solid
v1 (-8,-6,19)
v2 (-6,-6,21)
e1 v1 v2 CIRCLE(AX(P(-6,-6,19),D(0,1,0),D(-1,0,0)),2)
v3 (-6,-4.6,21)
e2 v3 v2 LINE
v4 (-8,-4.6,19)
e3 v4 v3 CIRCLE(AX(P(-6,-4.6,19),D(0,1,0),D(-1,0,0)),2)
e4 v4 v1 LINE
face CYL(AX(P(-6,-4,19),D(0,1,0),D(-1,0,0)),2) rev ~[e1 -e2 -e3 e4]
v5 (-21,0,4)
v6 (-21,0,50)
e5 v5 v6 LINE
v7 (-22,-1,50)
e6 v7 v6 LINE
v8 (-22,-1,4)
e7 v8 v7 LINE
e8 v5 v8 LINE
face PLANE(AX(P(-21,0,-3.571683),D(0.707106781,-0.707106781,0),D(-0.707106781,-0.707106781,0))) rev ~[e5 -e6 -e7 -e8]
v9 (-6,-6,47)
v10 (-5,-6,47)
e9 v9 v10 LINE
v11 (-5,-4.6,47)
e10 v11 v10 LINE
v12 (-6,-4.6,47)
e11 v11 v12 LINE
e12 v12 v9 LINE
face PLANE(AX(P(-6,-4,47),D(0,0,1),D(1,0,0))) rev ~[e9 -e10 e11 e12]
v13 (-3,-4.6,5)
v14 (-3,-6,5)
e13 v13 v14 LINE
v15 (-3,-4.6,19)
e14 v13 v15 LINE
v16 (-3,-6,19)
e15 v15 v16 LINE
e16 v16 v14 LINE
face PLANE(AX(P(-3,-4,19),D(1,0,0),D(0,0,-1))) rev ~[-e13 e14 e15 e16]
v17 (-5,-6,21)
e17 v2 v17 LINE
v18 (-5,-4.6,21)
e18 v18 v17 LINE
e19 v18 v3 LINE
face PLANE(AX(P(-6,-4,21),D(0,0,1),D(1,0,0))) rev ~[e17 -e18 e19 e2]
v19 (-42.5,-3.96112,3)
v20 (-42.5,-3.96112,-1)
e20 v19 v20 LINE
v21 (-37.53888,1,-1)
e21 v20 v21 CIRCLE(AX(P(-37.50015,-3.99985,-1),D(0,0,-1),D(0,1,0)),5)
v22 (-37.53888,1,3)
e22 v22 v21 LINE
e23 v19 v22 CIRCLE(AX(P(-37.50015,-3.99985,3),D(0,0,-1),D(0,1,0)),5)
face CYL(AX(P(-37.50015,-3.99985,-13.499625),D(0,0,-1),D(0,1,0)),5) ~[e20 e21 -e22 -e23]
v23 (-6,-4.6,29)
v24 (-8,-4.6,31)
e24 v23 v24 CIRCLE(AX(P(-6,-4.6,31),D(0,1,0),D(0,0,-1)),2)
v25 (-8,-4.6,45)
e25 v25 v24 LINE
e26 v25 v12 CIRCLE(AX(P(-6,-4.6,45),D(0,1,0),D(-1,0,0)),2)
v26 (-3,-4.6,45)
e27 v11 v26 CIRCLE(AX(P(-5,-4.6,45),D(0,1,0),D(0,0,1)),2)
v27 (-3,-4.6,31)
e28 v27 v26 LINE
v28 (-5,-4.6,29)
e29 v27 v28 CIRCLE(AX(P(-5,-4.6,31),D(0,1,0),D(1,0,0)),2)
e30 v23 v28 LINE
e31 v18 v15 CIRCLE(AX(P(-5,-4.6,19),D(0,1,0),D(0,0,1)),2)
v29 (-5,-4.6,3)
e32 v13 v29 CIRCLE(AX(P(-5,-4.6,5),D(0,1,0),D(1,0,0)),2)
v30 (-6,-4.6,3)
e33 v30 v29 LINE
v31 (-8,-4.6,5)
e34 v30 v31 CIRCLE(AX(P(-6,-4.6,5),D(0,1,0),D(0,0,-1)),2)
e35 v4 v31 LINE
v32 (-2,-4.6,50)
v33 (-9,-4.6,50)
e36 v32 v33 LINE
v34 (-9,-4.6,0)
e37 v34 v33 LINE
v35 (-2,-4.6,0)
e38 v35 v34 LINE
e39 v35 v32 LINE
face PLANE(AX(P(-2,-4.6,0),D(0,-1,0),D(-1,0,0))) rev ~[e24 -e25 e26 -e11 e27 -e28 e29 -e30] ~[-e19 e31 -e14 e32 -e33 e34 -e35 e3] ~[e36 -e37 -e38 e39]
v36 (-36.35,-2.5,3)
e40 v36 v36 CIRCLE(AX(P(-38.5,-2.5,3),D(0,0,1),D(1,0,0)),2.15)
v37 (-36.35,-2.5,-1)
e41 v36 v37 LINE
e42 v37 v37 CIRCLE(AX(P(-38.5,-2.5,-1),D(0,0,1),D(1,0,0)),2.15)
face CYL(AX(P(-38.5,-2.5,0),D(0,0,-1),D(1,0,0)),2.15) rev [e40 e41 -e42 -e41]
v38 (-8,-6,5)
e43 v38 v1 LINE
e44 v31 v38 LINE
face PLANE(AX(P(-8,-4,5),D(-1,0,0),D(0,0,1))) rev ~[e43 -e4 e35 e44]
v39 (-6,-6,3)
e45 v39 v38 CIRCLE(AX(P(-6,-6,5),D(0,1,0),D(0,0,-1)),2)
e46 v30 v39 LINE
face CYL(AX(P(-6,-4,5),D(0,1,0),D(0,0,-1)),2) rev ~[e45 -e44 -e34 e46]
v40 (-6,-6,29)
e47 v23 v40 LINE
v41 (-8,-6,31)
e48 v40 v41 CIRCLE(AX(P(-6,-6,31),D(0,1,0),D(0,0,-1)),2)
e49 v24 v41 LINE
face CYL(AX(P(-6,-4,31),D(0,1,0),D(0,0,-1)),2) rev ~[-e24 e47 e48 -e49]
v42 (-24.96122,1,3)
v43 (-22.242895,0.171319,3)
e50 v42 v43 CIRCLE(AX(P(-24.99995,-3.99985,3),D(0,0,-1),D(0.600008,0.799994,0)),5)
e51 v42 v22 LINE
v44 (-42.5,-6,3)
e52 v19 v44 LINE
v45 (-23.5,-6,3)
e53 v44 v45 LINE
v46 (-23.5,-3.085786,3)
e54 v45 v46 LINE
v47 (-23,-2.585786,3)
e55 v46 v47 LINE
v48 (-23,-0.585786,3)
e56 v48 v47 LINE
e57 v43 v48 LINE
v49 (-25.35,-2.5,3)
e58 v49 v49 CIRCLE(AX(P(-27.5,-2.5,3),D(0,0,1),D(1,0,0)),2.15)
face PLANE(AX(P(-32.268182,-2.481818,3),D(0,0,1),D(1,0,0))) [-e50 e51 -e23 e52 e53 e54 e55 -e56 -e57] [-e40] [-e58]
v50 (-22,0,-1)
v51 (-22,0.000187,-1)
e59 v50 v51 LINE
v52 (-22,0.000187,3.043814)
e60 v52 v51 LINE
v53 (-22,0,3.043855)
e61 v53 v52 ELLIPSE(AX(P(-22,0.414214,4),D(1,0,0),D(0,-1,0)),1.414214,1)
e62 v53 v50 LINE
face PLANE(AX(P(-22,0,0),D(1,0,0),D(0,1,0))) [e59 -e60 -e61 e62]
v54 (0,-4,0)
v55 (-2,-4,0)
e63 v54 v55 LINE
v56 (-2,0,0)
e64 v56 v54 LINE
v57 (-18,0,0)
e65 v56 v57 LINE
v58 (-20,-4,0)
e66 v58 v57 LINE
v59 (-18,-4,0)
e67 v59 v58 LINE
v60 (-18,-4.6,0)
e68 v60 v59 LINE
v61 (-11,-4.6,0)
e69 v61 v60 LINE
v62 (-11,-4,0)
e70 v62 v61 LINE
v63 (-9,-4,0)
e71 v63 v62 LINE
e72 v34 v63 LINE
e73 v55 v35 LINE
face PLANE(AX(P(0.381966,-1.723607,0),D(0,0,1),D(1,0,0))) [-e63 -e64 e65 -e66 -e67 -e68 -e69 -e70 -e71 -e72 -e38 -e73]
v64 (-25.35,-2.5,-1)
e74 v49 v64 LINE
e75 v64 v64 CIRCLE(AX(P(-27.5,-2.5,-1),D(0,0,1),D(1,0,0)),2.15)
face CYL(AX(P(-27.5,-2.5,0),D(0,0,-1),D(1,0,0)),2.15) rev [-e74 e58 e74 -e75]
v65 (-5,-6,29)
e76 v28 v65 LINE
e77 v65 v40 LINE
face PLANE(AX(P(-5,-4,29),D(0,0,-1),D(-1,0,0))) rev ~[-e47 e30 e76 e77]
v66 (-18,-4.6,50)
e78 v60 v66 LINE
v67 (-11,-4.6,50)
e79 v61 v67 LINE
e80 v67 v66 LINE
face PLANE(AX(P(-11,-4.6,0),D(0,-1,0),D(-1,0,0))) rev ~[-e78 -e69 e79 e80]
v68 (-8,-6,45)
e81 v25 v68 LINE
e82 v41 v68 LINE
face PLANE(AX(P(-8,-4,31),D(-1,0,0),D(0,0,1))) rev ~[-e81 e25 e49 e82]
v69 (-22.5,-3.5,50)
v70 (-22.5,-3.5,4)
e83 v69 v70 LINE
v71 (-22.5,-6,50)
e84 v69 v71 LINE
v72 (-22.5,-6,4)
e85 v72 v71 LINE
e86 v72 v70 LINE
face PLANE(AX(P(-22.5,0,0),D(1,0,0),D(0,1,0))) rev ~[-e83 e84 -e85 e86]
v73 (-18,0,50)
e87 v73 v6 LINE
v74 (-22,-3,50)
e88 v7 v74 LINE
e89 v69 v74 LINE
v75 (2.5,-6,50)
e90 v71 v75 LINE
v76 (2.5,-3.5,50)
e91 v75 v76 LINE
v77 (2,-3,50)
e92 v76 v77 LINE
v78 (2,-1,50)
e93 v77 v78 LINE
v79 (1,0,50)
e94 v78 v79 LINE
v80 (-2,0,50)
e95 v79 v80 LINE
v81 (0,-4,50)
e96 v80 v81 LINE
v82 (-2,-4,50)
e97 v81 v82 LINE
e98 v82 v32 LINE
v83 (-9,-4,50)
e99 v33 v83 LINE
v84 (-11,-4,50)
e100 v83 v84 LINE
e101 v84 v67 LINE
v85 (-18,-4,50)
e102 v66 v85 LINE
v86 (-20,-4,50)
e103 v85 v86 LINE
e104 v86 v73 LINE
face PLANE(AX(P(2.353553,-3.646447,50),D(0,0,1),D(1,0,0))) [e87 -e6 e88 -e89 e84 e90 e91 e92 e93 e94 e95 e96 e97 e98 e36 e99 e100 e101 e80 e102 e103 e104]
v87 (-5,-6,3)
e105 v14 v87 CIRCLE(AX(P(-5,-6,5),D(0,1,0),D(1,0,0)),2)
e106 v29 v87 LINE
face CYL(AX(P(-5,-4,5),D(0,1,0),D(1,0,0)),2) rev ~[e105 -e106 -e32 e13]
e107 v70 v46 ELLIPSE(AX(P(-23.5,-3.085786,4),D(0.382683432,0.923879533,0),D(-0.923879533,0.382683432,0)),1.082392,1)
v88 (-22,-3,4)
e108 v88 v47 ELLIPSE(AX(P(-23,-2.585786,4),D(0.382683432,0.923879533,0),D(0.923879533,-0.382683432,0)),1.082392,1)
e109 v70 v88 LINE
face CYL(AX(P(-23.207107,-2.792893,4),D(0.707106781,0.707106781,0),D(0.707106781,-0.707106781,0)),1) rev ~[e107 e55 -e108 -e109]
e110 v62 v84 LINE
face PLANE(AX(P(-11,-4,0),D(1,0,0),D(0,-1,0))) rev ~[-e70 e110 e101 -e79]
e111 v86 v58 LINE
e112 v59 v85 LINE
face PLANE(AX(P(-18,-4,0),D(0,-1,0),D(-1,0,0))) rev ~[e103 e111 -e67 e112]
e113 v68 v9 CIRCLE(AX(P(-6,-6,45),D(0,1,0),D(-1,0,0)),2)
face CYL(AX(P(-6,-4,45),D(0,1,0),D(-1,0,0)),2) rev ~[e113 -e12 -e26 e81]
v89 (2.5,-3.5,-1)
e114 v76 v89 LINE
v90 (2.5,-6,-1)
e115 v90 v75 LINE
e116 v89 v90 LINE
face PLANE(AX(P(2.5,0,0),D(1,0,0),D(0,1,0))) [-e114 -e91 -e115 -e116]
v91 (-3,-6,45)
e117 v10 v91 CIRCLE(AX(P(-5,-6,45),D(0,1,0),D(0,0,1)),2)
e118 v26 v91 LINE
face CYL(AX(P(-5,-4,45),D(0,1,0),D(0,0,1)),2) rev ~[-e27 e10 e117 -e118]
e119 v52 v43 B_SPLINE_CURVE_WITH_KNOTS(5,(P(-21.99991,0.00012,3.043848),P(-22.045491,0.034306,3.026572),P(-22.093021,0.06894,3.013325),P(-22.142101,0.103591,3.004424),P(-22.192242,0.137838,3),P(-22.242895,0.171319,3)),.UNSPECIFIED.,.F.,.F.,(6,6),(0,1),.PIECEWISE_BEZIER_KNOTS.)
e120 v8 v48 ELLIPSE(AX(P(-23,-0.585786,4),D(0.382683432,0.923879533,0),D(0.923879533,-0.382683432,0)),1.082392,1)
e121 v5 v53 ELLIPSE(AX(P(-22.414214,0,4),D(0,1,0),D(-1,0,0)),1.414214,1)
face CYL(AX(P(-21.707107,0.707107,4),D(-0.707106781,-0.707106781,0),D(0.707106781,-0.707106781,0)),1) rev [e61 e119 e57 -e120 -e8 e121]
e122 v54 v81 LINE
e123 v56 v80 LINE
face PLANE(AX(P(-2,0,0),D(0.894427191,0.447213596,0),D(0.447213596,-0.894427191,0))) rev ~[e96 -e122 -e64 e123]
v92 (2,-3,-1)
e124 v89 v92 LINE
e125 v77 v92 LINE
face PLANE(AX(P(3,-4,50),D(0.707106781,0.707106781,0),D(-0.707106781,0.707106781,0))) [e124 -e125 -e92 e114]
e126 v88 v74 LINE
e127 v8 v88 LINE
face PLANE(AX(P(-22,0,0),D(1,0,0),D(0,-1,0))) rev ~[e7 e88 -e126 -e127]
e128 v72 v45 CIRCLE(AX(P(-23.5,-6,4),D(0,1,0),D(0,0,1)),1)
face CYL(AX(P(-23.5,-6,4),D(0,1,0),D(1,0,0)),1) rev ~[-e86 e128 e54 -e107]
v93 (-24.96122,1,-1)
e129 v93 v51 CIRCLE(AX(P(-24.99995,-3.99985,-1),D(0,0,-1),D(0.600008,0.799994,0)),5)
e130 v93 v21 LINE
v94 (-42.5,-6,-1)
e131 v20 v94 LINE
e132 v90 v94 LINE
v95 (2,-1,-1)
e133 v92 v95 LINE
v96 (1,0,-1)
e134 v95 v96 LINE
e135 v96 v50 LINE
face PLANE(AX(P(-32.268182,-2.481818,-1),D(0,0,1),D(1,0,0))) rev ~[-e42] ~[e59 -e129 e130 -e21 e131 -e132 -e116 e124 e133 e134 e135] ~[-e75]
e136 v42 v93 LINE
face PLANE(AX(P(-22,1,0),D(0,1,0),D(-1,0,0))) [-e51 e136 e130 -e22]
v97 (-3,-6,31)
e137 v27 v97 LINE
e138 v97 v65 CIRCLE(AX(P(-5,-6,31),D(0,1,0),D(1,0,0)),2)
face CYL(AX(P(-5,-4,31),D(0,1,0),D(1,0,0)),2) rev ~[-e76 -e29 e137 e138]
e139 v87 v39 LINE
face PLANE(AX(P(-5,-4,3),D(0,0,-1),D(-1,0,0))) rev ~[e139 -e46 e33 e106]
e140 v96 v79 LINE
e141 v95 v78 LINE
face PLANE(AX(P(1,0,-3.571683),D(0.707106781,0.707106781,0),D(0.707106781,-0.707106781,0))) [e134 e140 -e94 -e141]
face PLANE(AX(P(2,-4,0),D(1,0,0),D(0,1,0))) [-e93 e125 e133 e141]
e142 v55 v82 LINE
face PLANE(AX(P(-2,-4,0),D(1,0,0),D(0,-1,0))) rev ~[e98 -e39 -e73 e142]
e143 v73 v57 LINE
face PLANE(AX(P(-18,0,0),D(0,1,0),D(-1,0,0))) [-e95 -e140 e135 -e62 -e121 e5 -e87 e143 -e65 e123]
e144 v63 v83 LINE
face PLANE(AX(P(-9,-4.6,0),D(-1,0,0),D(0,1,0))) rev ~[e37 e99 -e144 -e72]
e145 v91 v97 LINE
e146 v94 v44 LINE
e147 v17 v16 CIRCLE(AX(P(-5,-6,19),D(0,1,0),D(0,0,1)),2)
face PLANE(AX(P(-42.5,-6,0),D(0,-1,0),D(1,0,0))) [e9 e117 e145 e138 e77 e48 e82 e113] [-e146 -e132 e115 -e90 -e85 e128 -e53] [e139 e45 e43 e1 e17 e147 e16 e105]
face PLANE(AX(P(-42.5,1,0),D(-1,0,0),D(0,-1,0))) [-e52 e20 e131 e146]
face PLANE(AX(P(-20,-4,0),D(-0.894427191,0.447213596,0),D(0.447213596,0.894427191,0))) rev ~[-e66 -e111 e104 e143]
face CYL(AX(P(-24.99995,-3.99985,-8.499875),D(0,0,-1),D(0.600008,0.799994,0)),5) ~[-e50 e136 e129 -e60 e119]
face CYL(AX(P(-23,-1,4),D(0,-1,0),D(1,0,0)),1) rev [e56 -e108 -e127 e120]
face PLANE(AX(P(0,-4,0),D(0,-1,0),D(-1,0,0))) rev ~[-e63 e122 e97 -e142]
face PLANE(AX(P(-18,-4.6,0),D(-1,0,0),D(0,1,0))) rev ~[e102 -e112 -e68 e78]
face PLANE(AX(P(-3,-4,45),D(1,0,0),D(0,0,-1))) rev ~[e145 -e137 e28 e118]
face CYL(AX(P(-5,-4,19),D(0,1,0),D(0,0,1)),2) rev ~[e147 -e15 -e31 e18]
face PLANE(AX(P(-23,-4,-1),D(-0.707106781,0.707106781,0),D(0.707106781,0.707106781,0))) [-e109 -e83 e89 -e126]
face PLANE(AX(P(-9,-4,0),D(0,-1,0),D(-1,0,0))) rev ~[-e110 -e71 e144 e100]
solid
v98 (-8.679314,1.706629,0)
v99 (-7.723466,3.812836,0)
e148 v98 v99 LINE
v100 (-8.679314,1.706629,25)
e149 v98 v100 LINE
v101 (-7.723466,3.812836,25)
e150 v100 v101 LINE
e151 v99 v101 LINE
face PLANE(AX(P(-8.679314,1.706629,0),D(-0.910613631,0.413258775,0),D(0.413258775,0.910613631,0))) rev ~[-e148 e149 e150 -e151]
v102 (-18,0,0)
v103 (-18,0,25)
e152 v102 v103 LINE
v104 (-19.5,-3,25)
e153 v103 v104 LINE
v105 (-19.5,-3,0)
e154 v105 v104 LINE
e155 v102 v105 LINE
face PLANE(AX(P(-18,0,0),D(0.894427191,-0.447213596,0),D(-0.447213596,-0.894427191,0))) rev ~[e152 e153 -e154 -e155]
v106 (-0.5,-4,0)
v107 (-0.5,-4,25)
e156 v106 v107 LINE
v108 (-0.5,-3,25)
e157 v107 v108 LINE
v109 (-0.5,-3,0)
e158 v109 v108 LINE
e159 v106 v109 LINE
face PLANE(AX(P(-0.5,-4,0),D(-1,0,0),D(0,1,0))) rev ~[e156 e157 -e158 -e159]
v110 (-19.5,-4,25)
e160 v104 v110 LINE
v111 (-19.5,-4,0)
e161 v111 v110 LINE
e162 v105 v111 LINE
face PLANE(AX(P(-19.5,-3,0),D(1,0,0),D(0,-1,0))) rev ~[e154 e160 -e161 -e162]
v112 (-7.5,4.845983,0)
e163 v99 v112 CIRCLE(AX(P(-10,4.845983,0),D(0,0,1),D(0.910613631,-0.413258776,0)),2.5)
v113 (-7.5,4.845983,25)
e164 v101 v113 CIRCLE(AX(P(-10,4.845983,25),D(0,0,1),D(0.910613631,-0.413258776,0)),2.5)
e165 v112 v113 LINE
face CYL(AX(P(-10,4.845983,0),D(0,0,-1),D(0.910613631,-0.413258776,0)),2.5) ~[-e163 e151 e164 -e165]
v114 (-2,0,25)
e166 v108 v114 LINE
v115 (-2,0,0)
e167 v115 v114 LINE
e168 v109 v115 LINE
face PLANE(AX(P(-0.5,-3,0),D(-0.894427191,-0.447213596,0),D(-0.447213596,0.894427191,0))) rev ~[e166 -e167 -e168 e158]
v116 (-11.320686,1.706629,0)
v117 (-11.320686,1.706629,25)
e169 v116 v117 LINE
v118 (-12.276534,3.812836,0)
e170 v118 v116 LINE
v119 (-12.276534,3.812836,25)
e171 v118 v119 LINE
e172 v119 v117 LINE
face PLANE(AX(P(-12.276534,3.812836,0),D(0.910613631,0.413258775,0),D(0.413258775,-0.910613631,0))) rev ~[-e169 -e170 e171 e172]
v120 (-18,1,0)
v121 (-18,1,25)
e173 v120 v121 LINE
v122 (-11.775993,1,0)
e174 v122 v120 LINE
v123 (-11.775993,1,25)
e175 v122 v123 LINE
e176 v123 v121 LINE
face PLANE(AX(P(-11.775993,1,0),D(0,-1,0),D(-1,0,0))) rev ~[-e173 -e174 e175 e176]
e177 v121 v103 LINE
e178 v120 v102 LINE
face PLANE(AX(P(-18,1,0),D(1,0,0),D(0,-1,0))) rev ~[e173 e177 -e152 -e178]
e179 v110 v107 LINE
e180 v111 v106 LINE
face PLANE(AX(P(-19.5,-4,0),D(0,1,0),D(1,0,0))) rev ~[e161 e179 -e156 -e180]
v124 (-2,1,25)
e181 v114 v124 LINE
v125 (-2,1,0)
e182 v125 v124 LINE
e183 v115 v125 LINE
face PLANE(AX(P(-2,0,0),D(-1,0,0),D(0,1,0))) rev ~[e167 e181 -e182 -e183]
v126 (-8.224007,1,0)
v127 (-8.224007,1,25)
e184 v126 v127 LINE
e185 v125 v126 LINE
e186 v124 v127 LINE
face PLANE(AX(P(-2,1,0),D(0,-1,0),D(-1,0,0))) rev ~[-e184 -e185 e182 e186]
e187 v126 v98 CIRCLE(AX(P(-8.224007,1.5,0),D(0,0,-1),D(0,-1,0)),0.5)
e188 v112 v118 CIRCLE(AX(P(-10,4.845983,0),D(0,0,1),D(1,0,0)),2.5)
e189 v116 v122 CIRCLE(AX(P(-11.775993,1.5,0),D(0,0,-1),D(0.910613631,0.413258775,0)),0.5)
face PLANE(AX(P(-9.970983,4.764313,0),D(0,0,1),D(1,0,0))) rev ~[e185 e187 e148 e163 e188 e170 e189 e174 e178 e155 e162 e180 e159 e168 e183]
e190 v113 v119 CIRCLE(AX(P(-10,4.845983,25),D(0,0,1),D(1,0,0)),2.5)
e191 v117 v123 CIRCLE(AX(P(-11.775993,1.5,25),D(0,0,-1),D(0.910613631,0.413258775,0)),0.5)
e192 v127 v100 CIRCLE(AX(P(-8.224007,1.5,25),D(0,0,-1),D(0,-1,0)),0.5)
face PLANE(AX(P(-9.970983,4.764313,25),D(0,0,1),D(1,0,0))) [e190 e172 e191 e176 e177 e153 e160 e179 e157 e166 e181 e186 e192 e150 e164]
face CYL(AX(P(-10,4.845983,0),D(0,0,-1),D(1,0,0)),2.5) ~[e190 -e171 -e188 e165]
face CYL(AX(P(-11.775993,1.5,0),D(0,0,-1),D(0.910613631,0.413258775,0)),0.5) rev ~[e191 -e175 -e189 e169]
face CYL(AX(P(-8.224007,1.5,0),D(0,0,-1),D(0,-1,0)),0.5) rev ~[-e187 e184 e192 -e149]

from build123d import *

# Parameters (mm, degrees)
F1_DEPTH      = 50
F0_W          = 7
F0_H          = 0.6
F2_DEPTH      = 1
F3_T4_DEPTH   = 51
F3_T9_DEPTH   = 51
F3_T11_DEPTH  = 56.1433659759
F5_DEPTH      = 25
F6_DEPTH      = 25
F0_R          = 2.15
F7_DEPTH      = 3
F7_DEPTH_BACK = 1
F8_R          = 1
F9_T1_DEPTH   = 18.9997500167
F9_T3_DEPTH   = 28.9992500113


# Not quite as in the source:
# - a fillet or chamfer that OpenCascade refuses, or shapes differently, is made with other operations: its cross-section is extruded or revolved along the edge and cut away or added


with BuildPart() as f1:
    # F0 (on Top) → F1 (new body)
    with BuildSketch(Plane.XY):
        Polygon((2, 0), (0, 0), (-2, 0), (-0.5, -3), (0, -4), (2, -4), align=None)
        Polygon((-19.5, -3), (-18, 0), (-20, 0), (-22, 0), (-22, -4), (-20, -4), align=None)
        Polygon((2.5, -4), (2, -4), (0, -4), (-0.5, -4), (-2, -4), (-2, -4.6), (-9, -4.6), (-9, -4), (-11, -4), (-11, -4.6), (-18, -4.6), (-18, -4), (-19.5, -4), (-20, -4), (-22, -4), (-22.5, -4), (-22.5, -6), (2.5, -6), align=None)
    extrude(amount=F1_DEPTH)

    # F0 (on Top) + F1_face (on face) → F2 (join)
    with BuildSketch(Plane.XY):
        Polygon((2, 0), (0, 0), (-2, 0), (-0.5, -3), (0, -4), (2, -4), align=None)
        Polygon((-0.5, -3), (-2, 0), (-18, 0), (-19.5, -3), (-19.5, -4), (-18, -4), (-11, -4), (-9, -4), (-2, -4), (-0.5, -4), align=None)
        Polygon((0, -4), (-0.5, -3), (-0.5, -4), align=None)
        Polygon((-19.5, -4), (-19.5, -3), (-20, -4), align=None)
        with Locations((-5.5, -4.3)):
            Rectangle(F0_W, F0_H)
        with Locations((-14.5, -4.3)):
            Rectangle(F0_W, F0_H)
    with BuildSketch(Plane(origin=(-10, -3.9107723577, 0), x_dir=(1, 0, 0), z_dir=(0, 0, -1))):
        Polygon((8, -3.9107723577), (12, -3.9107723577), (12, 0.0892276423), (12.5, 0.0892276423), (12.5, 2.0892276423), (-12.5, 2.0892276423), (-12.5, 0.0892276423), (-12, 0.0892276423), (-12, -3.9107723577), (-8, -3.9107723577), (-10, 0.0892276423), (-8, 0.0892276423), (-8, 0.6892276423), (-1, 0.6892276423), (-1, 0.0892276423), (1, 0.0892276423), (1, 0.6892276423), (8, 0.6892276423), (8, 0.0892276423), (10, 0.0892276423), align=None)
    extrude(amount=-F2_DEPTH, dir=(0, 0, 1))

    # F3: chamfer of 1 on 4 edges, made by hand


with BuildPart() as f3_tool2:
    # F3_s3 → F3_t4 (new body)
    with BuildSketch(Plane.XY.offset(-1)):
        Polygon((-23, -4), (-22, -3), (-22, -4), align=None)
    extrude(amount=F3_T4_DEPTH)

    split(bisect_by=Plane.YZ.offset(-22.5), keep=Keep.TOP)


with BuildPart() as f1_1:
    add(f1.part)

    # F3_t1: union F3_tool2
    add(f3_tool2.part)


with BuildPart() as f3_tool7:
    # F3_s8 → F3_t9 (new body)
    with BuildSketch(Plane.XY.offset(50)):
        Polygon((3, -4), (2, -3), (2, -4), align=None)
    extrude(amount=-F3_T9_DEPTH)

    split(bisect_by=Plane.YZ.offset(2.5), keep=Keep.BOTTOM)


with BuildPart() as f1_2:
    add(f1_1.part)

    # F3_t6: union F3_tool7
    add(f3_tool7.part)

    # F3_s12 → F3_t11 (cut)
    with BuildSketch(Plane.XY.offset(-3.571682988)):
        Polygon((-21, 0), (-22, -1), (-22, 0), align=None)
        Polygon((1, 0), (2, -1), (2, 0), align=None)
    extrude(amount=F3_T11_DEPTH, mode=Mode.SUBTRACT)

    # F4 (on face) → F5 (cut)
    with BuildSketch(Plane(origin=(0, -4, 0), x_dir=(-1, 0, 0), z_dir=(0, 1, 0))):
        with BuildLine():
            ThreePointArc((8, 45), (7.4142135624, 46.4142135624), (6, 47))
            Line((6, 47), (5, 47))
            ThreePointArc((5, 47), (3.5857864376, 46.4142135624), (3, 45))
            Line((3, 45), (3, 31))
            ThreePointArc((3, 31), (3.5857864376, 29.5857864376), (5, 29))
            Line((5, 29), (6, 29))
            ThreePointArc((6, 29), (7.4142135624, 29.5857864376), (8, 31))
            Line((8, 31), (8, 45))
        make_face()
        with BuildLine():
            ThreePointArc((8, 19), (7.4142135624, 20.4142135624), (6, 21))
            Line((6, 21), (5, 21))
            ThreePointArc((5, 21), (3.5857864376, 20.4142135624), (3, 19))
            Line((3, 19), (3, 5))
            ThreePointArc((3, 5), (3.5857864376, 3.5857864376), (5, 3))
            Line((5, 3), (6, 3))
            ThreePointArc((6, 3), (7.4142135624, 3.5857864376), (8, 5))
            Line((8, 5), (8, 19))
        make_face()
    extrude(amount=-F5_DEPTH, mode=Mode.SUBTRACT)

    # F0 (on Top) → F7 (join, two sides)
    with BuildSketch(Plane.XY) as f7_sk:
        Polygon((-22, -4), (-22, 0), (-22, 1), (-42.5, 1), (-42.5, -6), (-22.5, -6), (-22.5, -4), align=None)
        with Locations((-38.5, -2.5)):
            Circle(F0_R, mode=Mode.SUBTRACT)
        with Locations((-27.5, -2.5)):
            Circle(F0_R, mode=Mode.SUBTRACT)
        Polygon((-19.5, -3), (-18, 0), (-20, 0), (-22, 0), (-22, -4), (-20, -4), align=None)
    extrude(amount=F7_DEPTH)
    extrude(f7_sk.sketch, amount=-F7_DEPTH_BACK)

    # F8
    f8_edges = [f1_2.edges().sort_by_distance(p)[0] for p in [
        (-22.5, -4.75, 3),
        (-22.25, -3.25, 3),
        (-22, -2, 3),
        (-21.5, -0.5, 3),
    ]]
    fillet(f8_edges, radius=F8_R)

    # F9: fillet of radius 5 on 2 edges, made by hand

    # F9_s2 → F9_t1 (cut)
    with BuildSketch(Plane.XY.offset(-8.4998750083)):
        with BuildLine():
            ThreePointArc((-21.9999099988, 0.0001199991), (-23.4187874519, 0.7435585843), (-24.9999499996, 1.00015))
            Line((-24.9999499996, 1.00015), (-24.9999499996, 1.10015))
            ThreePointArc((-24.9999499996, 1.10015), (-23.4999749998, 1.1), (-22, 1.1))
            Line((-22, 1.1), (-21.9, 1))
            ThreePointArc((-21.9, 1), (-21.9, 0.5000599995), (-21.9399091988, 0.0801193991))
            Line((-21.9399091988, 0.0801193991), (-21.9999099988, 0.0001199991))
        make_face()
    extrude(amount=F9_T1_DEPTH, mode=Mode.SUBTRACT)

    # F9_s4 → F9_t3 (cut)
    with BuildSketch(Plane.XY.offset(-13.4996250056)):
        with BuildLine():
            ThreePointArc((-37.50015, 1.00015), (-41.0356839059, -0.4643160941), (-42.50015, -3.99985))
            Line((-42.50015, -3.99985), (-42.60015, -3.99985))
            ThreePointArc((-42.60015, -3.99985), (-42.6, -1.499925), (-42.6, 1))
            Line((-42.6, 1), (-42.5, 1.1))
            ThreePointArc((-42.5, 1.1), (-40.000075, 1.1), (-37.50015, 1.10015))
            Line((-37.50015, 1.10015), (-37.50015, 1.00015))
        make_face()
    extrude(amount=F9_T3_DEPTH, mode=Mode.SUBTRACT)


with BuildPart() as f6:
    # F0 (on Top) → F6 (new body)
    with BuildSketch(Plane.XY):
        with BuildLine():
            ThreePointArc((-12.2765340768, 3.8128364101), (-10, 2.3459833488), (-7.7234659232, 3.8128364101))
            ThreePointArc((-7.7234659232, 3.8128364101), (-7.5565050448, 4.317464282), (-7.5, 4.8459833488))
            ThreePointArc((-7.5, 4.8459833488), (-10.5285190668, 7.289478304), (-12.2765340768, 3.8128364101))
        make_face()
        with BuildLine():
            Line((-18, 0), (-2, 0))
            Line((-2, 0), (-2, 1))
            Line((-2, 1), (-8.2240074562, 1))
            ThreePointArc((-8.2240074562, 1), (-8.6443137099, 1.2291815127), (-8.6793142716, 1.7066293877))
            Line((-8.6793142716, 1.7066293877), (-7.7234659232, 3.8128364101))
            ThreePointArc((-7.7234659232, 3.8128364101), (-10, 2.3459833488), (-12.2765340768, 3.8128364101))
            Line((-12.2765340768, 3.8128364101), (-11.3206857284, 1.7066293877))
            ThreePointArc((-11.3206857284, 1.7066293877), (-11.3556862901, 1.2291815127), (-11.7759925438, 1))
            Line((-11.7759925438, 1), (-18, 1))
            Line((-18, 1), (-18, 0))
        make_face()
        Polygon((-0.5, -3), (-2, 0), (-18, 0), (-19.5, -3), (-19.5, -4), (-18, -4), (-11, -4), (-9, -4), (-2, -4), (-0.5, -4), align=None)
    extrude(amount=F6_DEPTH)


solid = Compound([f1_2.part, f6.part])
